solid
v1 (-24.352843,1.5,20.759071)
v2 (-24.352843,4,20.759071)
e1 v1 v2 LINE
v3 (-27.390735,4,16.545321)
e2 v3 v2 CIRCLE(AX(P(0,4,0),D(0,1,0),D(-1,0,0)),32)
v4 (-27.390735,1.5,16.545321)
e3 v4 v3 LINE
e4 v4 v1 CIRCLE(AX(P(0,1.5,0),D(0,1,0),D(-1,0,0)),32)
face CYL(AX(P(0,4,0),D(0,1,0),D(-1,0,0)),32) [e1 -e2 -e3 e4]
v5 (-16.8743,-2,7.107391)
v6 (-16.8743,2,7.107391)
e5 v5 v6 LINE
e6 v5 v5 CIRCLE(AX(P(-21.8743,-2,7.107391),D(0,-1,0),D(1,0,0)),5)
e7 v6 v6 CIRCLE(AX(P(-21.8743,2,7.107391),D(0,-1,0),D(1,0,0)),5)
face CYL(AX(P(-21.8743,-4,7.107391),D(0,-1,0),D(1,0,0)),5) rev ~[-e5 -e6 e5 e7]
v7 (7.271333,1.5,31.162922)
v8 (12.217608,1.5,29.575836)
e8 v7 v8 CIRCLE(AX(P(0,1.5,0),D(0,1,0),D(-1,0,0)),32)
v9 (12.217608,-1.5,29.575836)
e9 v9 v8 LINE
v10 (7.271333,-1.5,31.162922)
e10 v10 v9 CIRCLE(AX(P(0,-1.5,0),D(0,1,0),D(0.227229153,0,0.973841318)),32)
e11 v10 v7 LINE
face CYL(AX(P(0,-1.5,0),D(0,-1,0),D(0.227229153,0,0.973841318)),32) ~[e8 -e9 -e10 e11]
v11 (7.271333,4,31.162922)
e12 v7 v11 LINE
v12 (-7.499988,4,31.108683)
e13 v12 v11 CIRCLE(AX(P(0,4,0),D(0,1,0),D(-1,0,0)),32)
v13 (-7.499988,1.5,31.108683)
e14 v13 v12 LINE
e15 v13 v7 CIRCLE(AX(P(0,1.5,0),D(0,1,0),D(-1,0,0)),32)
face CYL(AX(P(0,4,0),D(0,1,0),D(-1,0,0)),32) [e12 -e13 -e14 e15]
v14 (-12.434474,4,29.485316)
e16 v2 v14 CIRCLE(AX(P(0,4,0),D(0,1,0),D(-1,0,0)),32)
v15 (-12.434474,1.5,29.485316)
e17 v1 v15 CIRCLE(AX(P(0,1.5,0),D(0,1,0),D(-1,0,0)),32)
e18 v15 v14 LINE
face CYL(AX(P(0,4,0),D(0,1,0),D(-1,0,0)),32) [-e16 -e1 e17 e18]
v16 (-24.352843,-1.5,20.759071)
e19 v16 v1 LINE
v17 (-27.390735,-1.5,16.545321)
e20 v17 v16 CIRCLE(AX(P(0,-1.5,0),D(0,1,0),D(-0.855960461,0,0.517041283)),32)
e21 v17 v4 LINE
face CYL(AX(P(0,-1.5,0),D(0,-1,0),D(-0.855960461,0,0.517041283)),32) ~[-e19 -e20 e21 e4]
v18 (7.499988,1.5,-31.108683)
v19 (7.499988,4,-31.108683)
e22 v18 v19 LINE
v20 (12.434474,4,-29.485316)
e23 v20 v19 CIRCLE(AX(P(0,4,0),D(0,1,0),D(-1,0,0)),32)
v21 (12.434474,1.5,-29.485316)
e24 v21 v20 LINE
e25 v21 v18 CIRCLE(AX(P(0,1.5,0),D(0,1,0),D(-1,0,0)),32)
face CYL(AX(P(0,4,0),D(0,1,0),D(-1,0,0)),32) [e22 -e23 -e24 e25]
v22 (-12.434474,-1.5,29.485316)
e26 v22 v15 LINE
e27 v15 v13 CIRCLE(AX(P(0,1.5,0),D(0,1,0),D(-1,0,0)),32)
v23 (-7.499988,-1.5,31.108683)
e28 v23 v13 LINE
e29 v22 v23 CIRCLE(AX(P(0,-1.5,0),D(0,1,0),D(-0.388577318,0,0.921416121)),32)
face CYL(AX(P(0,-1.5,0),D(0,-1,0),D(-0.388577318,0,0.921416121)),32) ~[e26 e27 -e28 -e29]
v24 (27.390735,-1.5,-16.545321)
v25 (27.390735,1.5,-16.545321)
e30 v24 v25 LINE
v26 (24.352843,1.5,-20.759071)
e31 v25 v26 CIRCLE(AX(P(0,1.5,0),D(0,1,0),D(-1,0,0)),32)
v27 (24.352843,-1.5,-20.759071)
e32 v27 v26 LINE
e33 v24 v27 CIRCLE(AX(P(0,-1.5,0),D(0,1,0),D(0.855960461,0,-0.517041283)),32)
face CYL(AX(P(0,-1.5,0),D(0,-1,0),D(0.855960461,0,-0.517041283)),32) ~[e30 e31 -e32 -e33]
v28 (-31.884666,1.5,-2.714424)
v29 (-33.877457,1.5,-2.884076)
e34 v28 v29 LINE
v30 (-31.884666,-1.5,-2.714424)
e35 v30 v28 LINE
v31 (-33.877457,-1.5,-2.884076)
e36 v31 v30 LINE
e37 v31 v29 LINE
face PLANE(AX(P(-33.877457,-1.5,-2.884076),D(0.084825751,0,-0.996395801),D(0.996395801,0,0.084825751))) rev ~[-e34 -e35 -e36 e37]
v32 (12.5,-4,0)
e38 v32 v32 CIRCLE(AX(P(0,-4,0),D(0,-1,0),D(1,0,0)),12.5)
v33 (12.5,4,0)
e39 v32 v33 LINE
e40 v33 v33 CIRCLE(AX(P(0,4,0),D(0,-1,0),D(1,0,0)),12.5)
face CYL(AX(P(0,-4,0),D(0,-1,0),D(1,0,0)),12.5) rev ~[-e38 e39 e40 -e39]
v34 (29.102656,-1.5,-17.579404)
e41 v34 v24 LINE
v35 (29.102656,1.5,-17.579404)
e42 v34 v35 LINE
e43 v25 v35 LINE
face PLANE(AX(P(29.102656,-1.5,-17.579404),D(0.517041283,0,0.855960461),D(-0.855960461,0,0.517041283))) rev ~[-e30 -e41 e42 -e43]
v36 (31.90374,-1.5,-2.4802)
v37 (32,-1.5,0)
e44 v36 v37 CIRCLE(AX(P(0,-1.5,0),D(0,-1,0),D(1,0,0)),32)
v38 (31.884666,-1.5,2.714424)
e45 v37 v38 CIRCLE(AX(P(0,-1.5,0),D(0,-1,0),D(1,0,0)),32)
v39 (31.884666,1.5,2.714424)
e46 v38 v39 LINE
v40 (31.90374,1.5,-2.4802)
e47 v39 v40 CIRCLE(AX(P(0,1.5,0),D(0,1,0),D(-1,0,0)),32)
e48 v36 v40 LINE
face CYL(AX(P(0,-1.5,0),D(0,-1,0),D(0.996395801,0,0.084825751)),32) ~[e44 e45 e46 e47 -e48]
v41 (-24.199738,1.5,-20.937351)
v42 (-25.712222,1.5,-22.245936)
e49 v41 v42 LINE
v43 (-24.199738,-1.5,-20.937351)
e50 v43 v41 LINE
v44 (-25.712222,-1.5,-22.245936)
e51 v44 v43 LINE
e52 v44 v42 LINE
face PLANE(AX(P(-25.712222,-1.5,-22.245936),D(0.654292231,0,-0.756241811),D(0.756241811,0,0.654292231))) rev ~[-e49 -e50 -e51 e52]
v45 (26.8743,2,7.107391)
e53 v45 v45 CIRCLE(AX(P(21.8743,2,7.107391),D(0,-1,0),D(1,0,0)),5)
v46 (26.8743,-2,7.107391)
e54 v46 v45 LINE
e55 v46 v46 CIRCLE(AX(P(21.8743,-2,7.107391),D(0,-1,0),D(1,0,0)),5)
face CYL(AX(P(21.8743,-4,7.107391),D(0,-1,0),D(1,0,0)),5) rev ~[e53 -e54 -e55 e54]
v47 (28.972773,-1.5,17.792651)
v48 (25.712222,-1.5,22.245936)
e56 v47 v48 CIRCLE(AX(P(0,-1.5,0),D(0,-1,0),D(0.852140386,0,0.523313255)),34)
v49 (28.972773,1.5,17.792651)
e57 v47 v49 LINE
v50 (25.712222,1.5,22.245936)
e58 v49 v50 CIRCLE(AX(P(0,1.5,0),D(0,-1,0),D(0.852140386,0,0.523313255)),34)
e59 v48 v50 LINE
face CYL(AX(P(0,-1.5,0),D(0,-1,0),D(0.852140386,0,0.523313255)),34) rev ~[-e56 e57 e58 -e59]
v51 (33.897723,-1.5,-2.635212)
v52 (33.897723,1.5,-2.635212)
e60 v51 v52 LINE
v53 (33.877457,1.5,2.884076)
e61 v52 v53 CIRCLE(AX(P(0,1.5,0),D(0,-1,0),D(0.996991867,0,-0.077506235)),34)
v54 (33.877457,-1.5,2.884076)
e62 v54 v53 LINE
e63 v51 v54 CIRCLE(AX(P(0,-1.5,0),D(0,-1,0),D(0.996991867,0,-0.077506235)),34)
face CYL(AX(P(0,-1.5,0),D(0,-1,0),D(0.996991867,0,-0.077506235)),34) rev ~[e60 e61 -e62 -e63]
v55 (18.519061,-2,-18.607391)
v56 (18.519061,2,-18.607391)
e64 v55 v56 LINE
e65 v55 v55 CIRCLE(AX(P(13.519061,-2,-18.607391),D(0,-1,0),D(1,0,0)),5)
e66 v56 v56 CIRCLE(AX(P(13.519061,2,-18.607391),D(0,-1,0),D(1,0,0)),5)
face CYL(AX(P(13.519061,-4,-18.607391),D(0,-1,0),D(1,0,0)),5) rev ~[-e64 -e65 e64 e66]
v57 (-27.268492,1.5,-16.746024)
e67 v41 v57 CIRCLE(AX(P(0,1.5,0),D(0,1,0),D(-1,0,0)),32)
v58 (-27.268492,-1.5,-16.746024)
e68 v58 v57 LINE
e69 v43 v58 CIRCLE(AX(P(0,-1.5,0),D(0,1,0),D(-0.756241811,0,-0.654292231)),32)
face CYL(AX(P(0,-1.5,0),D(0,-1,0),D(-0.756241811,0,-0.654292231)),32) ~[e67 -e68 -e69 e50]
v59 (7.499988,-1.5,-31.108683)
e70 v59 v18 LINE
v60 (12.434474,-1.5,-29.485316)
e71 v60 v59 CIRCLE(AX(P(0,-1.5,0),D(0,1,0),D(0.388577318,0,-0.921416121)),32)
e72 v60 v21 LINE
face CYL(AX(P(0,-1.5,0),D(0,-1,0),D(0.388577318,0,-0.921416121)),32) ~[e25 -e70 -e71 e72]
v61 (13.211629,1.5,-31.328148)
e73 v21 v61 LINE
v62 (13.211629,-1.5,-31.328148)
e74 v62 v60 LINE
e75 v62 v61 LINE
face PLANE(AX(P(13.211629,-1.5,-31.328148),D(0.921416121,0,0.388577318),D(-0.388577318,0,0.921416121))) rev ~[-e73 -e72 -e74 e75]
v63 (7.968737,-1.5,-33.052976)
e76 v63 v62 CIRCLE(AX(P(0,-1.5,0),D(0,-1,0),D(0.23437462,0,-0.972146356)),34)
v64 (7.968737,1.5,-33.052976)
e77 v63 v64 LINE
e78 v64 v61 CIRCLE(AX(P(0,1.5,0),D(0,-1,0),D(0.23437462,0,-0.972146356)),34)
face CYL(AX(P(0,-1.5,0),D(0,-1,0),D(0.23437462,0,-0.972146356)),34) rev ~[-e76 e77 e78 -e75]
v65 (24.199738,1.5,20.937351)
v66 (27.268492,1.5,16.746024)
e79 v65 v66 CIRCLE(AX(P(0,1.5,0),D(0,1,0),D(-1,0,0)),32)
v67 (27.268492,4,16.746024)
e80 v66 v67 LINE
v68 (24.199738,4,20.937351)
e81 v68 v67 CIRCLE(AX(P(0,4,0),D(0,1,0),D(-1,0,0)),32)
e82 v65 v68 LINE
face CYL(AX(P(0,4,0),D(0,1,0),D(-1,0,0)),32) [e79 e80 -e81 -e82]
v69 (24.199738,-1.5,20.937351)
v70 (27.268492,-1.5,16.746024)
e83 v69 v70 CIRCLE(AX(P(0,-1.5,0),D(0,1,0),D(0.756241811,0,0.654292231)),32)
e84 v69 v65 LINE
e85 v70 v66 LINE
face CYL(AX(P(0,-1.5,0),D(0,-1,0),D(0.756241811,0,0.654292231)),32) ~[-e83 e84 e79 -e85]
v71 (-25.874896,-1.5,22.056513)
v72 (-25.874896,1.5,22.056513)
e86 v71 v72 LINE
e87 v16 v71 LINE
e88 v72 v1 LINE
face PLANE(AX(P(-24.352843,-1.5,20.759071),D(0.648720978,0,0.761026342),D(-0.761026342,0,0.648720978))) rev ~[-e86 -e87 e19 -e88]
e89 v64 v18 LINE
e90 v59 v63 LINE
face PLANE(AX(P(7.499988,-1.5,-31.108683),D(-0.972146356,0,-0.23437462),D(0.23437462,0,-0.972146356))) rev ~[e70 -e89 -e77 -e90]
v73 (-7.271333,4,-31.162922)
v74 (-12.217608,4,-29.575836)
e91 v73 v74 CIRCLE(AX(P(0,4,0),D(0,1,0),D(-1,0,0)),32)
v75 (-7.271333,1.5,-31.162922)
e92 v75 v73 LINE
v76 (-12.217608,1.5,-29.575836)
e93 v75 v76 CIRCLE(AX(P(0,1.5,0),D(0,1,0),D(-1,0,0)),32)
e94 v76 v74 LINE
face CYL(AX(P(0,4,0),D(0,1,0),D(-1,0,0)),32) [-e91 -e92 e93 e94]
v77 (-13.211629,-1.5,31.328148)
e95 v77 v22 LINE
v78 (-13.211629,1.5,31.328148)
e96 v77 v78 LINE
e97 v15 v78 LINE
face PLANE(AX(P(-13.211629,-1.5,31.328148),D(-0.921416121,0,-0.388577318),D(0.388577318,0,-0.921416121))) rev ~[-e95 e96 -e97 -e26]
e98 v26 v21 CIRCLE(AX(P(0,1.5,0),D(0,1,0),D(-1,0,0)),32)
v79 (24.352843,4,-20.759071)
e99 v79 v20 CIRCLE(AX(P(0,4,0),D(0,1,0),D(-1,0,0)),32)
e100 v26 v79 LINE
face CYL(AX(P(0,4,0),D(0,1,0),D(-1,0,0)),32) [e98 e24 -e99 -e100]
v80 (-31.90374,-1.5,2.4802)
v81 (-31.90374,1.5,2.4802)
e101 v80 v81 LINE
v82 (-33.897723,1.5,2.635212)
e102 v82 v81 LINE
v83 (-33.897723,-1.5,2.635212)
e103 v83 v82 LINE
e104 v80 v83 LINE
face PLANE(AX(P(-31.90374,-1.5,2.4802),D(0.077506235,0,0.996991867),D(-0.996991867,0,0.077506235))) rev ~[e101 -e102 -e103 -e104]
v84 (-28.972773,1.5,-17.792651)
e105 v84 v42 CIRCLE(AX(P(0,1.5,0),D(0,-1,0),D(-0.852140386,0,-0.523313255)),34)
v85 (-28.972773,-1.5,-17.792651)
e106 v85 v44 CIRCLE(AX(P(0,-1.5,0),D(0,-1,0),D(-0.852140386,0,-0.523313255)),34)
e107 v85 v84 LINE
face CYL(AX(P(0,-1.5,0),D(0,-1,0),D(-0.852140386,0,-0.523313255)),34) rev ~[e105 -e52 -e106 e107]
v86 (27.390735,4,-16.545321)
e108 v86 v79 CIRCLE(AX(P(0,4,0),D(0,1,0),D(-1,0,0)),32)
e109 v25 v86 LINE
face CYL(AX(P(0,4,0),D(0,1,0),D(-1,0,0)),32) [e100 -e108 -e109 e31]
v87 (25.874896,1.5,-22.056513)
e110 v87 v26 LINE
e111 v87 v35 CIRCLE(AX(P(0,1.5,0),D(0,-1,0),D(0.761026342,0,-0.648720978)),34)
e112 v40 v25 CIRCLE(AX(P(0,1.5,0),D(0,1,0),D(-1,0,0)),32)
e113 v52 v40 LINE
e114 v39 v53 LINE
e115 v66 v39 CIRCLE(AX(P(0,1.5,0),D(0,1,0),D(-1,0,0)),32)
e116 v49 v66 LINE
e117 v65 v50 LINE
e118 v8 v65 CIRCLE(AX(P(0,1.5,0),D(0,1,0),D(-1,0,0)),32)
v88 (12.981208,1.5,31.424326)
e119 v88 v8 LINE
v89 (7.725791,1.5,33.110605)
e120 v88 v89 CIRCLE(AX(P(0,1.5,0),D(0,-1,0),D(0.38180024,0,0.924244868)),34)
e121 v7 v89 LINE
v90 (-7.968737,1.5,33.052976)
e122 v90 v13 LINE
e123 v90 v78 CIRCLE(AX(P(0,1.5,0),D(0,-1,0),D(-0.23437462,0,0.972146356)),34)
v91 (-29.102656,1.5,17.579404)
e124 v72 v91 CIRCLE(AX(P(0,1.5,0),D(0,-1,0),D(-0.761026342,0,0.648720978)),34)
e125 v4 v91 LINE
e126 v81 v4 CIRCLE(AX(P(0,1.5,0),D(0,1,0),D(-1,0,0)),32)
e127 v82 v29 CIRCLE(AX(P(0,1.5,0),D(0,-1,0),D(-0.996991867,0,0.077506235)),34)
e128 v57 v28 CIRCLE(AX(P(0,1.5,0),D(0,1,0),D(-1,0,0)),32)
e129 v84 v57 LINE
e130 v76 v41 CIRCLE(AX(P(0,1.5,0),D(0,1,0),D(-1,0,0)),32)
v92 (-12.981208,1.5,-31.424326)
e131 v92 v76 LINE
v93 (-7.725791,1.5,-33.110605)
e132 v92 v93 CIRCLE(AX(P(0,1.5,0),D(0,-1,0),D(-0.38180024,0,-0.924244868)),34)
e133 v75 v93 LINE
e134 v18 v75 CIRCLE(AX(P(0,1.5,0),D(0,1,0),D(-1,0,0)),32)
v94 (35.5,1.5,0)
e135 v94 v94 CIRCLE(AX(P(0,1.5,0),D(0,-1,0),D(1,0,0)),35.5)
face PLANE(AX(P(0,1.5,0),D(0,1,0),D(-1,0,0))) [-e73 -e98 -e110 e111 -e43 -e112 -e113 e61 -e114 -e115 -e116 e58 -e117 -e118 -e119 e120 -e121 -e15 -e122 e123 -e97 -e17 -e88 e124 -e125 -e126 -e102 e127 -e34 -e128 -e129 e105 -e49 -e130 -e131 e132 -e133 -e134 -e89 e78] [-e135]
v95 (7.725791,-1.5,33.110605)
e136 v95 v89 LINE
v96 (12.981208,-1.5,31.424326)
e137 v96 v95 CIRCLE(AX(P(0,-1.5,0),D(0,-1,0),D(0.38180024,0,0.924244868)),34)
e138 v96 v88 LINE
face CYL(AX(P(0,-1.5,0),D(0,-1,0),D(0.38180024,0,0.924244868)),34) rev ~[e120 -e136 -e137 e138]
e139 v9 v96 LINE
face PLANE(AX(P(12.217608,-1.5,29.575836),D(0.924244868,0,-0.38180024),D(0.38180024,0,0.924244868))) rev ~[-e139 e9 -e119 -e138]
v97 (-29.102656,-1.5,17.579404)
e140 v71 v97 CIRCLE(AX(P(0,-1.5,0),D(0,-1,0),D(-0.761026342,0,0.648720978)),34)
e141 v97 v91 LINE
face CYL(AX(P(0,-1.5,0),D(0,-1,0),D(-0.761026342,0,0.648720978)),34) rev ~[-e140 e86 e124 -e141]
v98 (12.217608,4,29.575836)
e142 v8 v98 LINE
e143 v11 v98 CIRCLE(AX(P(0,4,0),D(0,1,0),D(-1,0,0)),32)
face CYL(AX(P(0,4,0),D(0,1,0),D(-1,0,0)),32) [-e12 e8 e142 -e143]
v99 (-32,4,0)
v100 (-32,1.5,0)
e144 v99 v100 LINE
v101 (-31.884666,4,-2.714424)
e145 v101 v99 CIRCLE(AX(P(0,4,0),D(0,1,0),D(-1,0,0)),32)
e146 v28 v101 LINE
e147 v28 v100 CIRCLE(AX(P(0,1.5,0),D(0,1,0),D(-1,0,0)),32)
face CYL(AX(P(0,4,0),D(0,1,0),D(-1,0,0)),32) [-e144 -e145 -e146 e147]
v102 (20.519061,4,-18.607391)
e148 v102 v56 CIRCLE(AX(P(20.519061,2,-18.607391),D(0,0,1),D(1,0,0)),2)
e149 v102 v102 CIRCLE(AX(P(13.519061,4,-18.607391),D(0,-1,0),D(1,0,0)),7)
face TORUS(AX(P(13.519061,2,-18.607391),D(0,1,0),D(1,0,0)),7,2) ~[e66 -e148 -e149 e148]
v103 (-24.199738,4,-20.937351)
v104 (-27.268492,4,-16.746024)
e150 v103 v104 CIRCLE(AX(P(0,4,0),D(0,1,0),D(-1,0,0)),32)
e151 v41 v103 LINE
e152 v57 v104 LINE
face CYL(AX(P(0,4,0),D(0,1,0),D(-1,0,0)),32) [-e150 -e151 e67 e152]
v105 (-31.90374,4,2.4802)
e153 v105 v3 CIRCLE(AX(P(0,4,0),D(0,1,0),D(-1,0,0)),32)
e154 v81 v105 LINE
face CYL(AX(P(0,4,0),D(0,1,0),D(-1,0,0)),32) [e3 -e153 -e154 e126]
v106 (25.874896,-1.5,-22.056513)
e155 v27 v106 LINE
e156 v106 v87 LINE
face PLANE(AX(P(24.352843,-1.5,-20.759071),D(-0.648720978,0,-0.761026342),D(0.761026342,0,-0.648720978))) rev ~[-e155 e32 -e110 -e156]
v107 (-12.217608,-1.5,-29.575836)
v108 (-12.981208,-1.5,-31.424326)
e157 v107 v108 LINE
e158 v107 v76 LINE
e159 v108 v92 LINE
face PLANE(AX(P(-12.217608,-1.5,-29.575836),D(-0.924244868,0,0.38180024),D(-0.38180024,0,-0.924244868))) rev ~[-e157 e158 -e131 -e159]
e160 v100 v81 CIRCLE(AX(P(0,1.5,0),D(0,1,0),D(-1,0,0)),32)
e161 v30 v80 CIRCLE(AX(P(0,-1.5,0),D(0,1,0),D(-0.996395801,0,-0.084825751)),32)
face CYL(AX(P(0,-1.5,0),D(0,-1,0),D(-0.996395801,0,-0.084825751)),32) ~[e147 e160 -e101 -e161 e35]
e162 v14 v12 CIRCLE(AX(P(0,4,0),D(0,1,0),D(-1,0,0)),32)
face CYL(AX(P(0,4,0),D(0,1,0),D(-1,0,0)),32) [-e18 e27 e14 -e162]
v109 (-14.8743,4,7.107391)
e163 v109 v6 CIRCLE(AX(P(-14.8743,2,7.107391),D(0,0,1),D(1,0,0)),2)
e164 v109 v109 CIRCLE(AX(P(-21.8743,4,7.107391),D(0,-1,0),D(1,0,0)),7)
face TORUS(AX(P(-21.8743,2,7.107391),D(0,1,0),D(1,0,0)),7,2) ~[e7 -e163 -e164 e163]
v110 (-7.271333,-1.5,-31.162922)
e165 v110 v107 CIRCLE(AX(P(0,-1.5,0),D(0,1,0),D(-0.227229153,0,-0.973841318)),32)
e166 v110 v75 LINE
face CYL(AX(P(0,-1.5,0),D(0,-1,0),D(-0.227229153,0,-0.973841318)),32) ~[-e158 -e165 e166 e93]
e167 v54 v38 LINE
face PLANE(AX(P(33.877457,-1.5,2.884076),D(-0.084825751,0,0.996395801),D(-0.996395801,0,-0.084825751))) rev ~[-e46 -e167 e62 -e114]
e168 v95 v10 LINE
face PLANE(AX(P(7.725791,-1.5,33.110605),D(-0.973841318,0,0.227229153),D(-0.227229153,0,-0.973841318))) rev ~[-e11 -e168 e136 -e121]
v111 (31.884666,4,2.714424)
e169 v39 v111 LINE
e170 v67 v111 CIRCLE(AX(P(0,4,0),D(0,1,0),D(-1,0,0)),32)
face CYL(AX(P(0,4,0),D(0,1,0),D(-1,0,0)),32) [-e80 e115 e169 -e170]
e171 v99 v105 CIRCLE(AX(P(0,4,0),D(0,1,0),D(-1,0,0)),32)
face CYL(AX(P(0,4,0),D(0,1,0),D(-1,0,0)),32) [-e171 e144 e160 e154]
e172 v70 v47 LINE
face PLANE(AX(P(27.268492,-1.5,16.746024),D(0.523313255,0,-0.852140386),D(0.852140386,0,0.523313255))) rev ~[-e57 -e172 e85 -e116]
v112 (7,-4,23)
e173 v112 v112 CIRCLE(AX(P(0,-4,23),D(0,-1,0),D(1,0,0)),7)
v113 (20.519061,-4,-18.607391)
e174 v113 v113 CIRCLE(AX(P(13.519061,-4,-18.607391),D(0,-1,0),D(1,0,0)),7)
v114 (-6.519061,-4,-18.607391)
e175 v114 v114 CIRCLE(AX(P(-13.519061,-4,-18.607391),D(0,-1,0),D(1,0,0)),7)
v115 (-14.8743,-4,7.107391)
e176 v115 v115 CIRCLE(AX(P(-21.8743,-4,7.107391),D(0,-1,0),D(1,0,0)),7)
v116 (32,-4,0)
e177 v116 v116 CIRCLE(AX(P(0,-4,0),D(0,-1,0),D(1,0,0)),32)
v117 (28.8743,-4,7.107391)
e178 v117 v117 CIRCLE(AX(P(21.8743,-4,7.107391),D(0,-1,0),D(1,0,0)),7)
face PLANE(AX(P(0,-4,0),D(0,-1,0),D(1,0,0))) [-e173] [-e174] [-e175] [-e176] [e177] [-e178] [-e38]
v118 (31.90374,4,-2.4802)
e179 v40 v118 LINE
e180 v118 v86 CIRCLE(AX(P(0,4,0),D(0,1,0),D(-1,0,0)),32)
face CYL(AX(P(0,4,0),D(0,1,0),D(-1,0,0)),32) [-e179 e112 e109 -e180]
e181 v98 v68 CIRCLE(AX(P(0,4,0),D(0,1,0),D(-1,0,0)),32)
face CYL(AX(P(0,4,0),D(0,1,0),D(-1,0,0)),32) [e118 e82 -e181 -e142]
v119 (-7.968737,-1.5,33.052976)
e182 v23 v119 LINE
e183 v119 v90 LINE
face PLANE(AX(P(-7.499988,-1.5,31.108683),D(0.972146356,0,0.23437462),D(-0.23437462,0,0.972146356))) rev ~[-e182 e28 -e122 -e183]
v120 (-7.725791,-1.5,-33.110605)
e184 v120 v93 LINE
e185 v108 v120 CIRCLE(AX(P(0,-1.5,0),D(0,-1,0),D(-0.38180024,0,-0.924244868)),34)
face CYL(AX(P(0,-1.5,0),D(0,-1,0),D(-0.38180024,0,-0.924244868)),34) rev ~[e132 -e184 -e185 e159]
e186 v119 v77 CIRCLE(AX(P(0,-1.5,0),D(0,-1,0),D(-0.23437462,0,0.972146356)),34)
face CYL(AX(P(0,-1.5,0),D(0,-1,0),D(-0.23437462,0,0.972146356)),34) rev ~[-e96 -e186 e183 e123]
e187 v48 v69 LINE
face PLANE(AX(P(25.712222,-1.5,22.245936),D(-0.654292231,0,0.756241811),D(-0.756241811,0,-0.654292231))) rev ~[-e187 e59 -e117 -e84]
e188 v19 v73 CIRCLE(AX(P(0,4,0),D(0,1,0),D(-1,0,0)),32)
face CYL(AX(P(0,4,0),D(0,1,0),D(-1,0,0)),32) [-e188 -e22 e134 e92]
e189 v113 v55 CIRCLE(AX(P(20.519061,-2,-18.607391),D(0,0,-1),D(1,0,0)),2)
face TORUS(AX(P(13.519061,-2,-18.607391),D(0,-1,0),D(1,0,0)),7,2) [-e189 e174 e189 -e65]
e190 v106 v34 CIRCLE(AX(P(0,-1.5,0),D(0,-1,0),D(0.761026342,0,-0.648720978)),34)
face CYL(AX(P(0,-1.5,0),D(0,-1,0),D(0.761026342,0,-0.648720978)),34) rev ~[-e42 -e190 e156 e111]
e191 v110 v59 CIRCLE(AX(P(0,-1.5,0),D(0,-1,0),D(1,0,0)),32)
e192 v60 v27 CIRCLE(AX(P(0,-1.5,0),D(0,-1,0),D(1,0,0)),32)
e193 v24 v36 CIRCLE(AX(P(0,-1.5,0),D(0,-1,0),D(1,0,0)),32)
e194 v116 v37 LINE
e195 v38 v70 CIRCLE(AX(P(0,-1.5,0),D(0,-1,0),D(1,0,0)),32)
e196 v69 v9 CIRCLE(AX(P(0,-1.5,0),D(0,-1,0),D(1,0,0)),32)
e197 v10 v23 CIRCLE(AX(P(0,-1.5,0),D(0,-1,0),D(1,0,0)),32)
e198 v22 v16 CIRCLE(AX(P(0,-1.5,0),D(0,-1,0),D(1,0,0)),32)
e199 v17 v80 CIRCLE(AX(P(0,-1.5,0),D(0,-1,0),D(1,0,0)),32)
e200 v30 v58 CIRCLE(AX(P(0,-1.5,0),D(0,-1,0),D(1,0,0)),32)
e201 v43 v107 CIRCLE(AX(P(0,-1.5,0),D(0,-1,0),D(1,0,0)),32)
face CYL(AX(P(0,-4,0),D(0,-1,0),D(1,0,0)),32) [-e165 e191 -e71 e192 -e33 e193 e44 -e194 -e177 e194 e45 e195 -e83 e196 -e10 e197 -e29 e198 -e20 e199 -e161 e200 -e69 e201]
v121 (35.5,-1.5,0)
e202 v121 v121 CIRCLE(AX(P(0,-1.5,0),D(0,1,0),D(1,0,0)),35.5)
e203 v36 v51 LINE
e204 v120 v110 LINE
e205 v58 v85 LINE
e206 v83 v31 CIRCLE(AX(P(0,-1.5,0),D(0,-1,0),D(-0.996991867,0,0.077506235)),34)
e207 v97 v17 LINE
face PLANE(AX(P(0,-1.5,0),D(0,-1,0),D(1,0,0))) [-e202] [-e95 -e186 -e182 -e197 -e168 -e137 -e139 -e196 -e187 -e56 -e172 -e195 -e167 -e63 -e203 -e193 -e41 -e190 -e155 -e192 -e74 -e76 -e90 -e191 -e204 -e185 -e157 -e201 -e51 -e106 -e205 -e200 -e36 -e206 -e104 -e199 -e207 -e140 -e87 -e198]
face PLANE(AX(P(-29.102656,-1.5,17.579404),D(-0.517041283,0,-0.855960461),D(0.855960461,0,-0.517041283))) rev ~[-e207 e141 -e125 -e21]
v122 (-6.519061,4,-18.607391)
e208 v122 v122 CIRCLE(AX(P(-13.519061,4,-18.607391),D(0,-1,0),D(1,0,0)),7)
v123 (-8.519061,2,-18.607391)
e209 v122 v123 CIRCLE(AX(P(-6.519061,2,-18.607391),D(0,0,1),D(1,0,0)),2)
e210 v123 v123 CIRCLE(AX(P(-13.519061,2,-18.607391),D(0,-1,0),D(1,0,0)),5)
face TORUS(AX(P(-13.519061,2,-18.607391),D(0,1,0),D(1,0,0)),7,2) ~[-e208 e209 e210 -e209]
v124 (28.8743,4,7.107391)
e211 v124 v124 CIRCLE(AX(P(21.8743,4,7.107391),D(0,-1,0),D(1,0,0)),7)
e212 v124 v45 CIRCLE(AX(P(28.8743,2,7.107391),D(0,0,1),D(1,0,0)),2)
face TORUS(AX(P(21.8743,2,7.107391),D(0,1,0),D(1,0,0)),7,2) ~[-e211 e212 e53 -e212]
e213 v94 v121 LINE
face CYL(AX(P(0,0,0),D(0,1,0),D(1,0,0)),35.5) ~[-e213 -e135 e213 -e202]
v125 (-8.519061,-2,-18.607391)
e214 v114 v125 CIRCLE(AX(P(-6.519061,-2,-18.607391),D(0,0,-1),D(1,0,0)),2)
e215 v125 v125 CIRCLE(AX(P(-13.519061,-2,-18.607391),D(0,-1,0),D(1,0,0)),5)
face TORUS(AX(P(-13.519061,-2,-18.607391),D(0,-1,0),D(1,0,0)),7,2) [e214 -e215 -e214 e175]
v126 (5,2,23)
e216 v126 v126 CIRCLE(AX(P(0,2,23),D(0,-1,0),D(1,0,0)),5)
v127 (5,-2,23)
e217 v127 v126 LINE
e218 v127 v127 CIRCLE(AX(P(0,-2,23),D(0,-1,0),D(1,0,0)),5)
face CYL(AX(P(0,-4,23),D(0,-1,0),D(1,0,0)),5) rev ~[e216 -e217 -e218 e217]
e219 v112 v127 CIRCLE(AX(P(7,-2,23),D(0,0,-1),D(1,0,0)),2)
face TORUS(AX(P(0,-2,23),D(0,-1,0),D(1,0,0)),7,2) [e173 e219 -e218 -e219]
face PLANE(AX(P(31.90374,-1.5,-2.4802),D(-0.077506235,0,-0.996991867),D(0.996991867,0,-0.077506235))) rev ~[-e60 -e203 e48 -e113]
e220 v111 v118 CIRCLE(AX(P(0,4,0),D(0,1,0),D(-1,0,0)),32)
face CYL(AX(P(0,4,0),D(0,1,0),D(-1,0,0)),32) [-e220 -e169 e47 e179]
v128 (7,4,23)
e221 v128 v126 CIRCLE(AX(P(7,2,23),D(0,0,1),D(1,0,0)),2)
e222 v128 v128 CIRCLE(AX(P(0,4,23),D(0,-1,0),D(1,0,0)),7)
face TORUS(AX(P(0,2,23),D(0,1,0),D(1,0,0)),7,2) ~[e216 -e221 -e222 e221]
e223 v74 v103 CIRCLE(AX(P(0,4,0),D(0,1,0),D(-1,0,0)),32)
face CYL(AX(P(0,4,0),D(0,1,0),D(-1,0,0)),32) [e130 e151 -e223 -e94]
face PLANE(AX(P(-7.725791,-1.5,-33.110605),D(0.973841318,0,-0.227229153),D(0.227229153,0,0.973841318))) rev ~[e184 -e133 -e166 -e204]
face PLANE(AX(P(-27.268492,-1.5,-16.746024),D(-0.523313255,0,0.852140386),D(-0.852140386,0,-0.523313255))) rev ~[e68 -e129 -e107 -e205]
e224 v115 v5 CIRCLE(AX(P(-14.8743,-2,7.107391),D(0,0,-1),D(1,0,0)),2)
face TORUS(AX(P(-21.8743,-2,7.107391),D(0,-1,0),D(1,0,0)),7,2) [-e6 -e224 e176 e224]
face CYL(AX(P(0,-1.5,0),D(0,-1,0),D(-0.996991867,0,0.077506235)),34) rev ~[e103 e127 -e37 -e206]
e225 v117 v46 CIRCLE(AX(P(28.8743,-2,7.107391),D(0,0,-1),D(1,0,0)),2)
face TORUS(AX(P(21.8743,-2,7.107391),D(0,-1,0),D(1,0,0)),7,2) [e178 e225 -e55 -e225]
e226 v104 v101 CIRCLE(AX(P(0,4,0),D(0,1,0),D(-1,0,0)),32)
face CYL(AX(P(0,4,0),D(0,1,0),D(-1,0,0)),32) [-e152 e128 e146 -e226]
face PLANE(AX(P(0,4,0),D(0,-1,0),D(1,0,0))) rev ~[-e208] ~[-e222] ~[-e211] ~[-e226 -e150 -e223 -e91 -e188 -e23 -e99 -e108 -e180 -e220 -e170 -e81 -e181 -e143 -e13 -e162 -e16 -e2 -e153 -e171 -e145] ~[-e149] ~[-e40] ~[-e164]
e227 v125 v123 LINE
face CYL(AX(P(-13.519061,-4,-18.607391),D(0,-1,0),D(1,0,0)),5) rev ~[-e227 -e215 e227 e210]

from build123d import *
from build123d import SkipClean  # not in build123d's __all__

# Parameters (mm, degrees)
F0_R          = 35.5
F1_DEPTH      = 4
F1_DEPTH_BACK = 4
F2_R          = 12.5
F3_DEPTH      = 25
F4_R          = 5
F5_DEPTH      = 25
F7_R          = 2
F8_R          = 36.3546739932
F8_R_2        = 32
F9_DEPTH      = 2.5
F10_R         = 42.2294694384
F10_R_2       = 32
F11_DEPTH     = 2.5
F13_DEPTH     = 25


# Not quite as in the source:
# - a feature names something its author has since deleted; it is built from what else it names


with BuildPart() as f1:
    # F0 (on Front) → F1 (new body, two sides)
    with BuildSketch(Plane.XZ) as f1_sk:
        Circle(F0_R)
    extrude(amount=-F1_DEPTH)
    extrude(f1_sk.sketch, amount=F1_DEPTH_BACK)

    # F2 (on face) → F3 (cut)
    with BuildSketch(Plane.XZ.offset(4)):
        Circle(F2_R)
    extrude(amount=-F3_DEPTH, mode=Mode.SUBTRACT)

    # F4 (on face) → F5 (cut)
    with BuildSketch(Plane.XZ.offset(4)):
        with Locations((0, 23)):
            Circle(F4_R)
        with Locations((-21.8742998748, 7.1073908706)):
            Circle(F4_R)
        with Locations((-13.5190608027, -18.6073908706)):
            Circle(F4_R)
        with Locations((13.5190608027, -18.6073908706)):
            Circle(F4_R)
        with Locations((21.8742998748, 7.1073908706)):
            Circle(F4_R)
    extrude(amount=-F5_DEPTH, mode=Mode.SUBTRACT)

    # F7
    f7_edges = [f1.edges().sort_by_distance(p)[0] for p in [
        (-5, -4, 23),
        (-26.8743, -4, 7.107391),
        (-18.519061, -4, -18.607391),
        (-26.8743, 4, 7.107391),
        (-18.519061, 4, -18.607391),
        (-5, 4, 23),
        (8.519061, -4, -18.607391),
        (8.519061, 4, -18.607391),
        (16.8743, -4, 7.107391),
        (16.8743, 4, 7.107391),
    ]]
    fillet(f7_edges, radius=F7_R)

    # F8 (on face) → F9 (cut)
    with BuildSketch(Plane.XZ.offset(4)):
        Circle(F8_R)
        Circle(F8_R_2, mode=Mode.SUBTRACT)
    extrude(amount=-F9_DEPTH, mode=Mode.SUBTRACT)

    # F10 (on face) → F11 (cut)
    with BuildSketch(Plane(origin=(0, 4, 0), x_dir=(-1, 0, 0), z_dir=(0, 1, 0))):
        Circle(F10_R)
        Circle(F10_R_2, mode=Mode.SUBTRACT)
    extrude(amount=-F11_DEPTH, mode=Mode.SUBTRACT)

    # F12 (on face) → F13 (cut)
    with BuildSketch(Plane.XZ.offset(1.5)):
        with BuildLine():
            ThreePointArc((7.2713328894, 31.1629221674), (9.7767280825, 30.4699128322), (12.2176076875, 29.5758357852))
            Line((12.2176076875, 29.5758357852), (12.981208168, 31.4243255218))
            ThreePointArc((12.981208168, 31.4243255218), (10.3877735876, 32.3742823842), (7.725791195, 33.1106048029))
            Line((7.725791195, 33.1106048029), (7.2713328894, 31.1629221674))
        make_face()
        with BuildLine():
            Line((-7.499987849, 31.1086833901), (-7.9687370895, 33.052976102))
            ThreePointArc((-7.9687370895, 33.052976102), (-10.6252403729, 32.2971247485), (-13.2116288258, 31.3281481063))
            Line((-13.2116288258, 31.3281481063), (-12.434474189, 29.4853158647))
            ThreePointArc((-12.434474189, 29.4853158647), (-10.0002262333, 30.3972938809), (-7.499987849, 31.1086833901))
        make_face()
        with BuildLine():
            Line((-24.3528429424, 20.7590712852), (-25.8748956263, 22.0565132405))
            ThreePointArc((-25.8748956263, 22.0565132405), (-27.5797736496, 19.8835631977), (-29.102655682, 17.5794036377))
            Line((-29.102655682, 17.5794036377), (-27.3907347595, 16.5453210707))
            ThreePointArc((-27.3907347595, 16.5453210707), (-25.9574340231, 18.7139418332), (-24.3528429424, 20.7590712852))
        make_face()
        with BuildLine():
            Line((-31.9037397545, 2.4801995243), (-33.8977234891, 2.6352119945))
            ThreePointArc((-33.8977234891, 2.6352119945), (-33.9997707942, -0.1248436771), (-33.8774572305, -2.8840755186))
            Line((-33.8774572305, -2.8840755186), (-31.8846656287, -2.7144240175))
            ThreePointArc((-31.8846656287, -2.7144240175), (-31.9997842769, -0.1174999314), (-31.9037397545, 2.4801995243))
        make_face()
        with BuildLine():
            Line((-27.2684923486, -16.7460241561), (-28.9727731204, -17.7926506658))
            ThreePointArc((-28.9727731204, -17.7926506658), (-27.4330111051, -20.0855645105), (-25.7122215694, -22.2459358528))
            Line((-25.7122215694, -22.2459358528), (-24.1997379476, -20.9373513909))
            ThreePointArc((-24.1997379476, -20.9373513909), (-25.8193045695, -18.9040607158), (-27.2684923486, -16.7460241561))
        make_face()
        with BuildLine():
            Line((-12.2176076875, -29.5758357852), (-12.981208168, -31.4243255218))
            ThreePointArc((-12.981208168, -31.4243255218), (-10.3877735876, -32.3742823842), (-7.725791195, -33.1106048029))
            Line((-7.725791195, -33.1106048029), (-7.2713328894, -31.1629221674))
            ThreePointArc((-7.2713328894, -31.1629221674), (-9.7767280825, -30.4699128322), (-12.2176076875, -29.5758357852))
        make_face()
        with BuildLine():
            Line((7.499987849, -31.1086833901), (7.9687370895, -33.052976102))
            ThreePointArc((7.9687370895, -33.052976102), (10.6252403729, -32.2971247485), (13.2116288258, -31.3281481063))
            Line((13.2116288258, -31.3281481063), (12.434474189, -29.4853158647))
            ThreePointArc((12.434474189, -29.4853158647), (10.0002262333, -30.3972938809), (7.499987849, -31.1086833901))
        make_face()
        with BuildLine():
            Line((24.3528429424, -20.7590712852), (25.8748956263, -22.0565132405))
            ThreePointArc((25.8748956263, -22.0565132405), (27.5797736496, -19.8835631977), (29.102655682, -17.5794036377))
            Line((29.102655682, -17.5794036377), (27.3907347595, -16.5453210707))
            ThreePointArc((27.3907347595, -16.5453210707), (25.9574340231, -18.7139418332), (24.3528429424, -20.7590712852))
        make_face()
        with BuildLine():
            Line((31.9037397545, -2.4801995243), (33.8977234891, -2.6352119945))
            ThreePointArc((33.8977234891, -2.6352119945), (33.9997707942, 0.1248436771), (33.8774572305, 2.8840755186))
            Line((33.8774572305, 2.8840755186), (31.8846656287, 2.7144240175))
            ThreePointArc((31.8846656287, 2.7144240175), (31.9997842769, 0.1174999314), (31.9037397545, -2.4801995243))
        make_face()
        with BuildLine():
            Line((27.2684923486, 16.7460241561), (28.9727731204, 17.7926506658))
            ThreePointArc((28.9727731204, 17.7926506658), (27.4330111051, 20.0855645105), (25.7122215694, 22.2459358528))
            Line((25.7122215694, 22.2459358528), (24.1997379476, 20.9373513909))
            ThreePointArc((24.1997379476, 20.9373513909), (25.8193045695, 18.9040607158), (27.2684923486, 16.7460241561))
        make_face()
    with SkipClean():  # cleaning this boolean's faces spoils the solid; the shape is the same uncleaned
        extrude(amount=-F13_DEPTH, mode=Mode.SUBTRACT)


solid = f1.part
